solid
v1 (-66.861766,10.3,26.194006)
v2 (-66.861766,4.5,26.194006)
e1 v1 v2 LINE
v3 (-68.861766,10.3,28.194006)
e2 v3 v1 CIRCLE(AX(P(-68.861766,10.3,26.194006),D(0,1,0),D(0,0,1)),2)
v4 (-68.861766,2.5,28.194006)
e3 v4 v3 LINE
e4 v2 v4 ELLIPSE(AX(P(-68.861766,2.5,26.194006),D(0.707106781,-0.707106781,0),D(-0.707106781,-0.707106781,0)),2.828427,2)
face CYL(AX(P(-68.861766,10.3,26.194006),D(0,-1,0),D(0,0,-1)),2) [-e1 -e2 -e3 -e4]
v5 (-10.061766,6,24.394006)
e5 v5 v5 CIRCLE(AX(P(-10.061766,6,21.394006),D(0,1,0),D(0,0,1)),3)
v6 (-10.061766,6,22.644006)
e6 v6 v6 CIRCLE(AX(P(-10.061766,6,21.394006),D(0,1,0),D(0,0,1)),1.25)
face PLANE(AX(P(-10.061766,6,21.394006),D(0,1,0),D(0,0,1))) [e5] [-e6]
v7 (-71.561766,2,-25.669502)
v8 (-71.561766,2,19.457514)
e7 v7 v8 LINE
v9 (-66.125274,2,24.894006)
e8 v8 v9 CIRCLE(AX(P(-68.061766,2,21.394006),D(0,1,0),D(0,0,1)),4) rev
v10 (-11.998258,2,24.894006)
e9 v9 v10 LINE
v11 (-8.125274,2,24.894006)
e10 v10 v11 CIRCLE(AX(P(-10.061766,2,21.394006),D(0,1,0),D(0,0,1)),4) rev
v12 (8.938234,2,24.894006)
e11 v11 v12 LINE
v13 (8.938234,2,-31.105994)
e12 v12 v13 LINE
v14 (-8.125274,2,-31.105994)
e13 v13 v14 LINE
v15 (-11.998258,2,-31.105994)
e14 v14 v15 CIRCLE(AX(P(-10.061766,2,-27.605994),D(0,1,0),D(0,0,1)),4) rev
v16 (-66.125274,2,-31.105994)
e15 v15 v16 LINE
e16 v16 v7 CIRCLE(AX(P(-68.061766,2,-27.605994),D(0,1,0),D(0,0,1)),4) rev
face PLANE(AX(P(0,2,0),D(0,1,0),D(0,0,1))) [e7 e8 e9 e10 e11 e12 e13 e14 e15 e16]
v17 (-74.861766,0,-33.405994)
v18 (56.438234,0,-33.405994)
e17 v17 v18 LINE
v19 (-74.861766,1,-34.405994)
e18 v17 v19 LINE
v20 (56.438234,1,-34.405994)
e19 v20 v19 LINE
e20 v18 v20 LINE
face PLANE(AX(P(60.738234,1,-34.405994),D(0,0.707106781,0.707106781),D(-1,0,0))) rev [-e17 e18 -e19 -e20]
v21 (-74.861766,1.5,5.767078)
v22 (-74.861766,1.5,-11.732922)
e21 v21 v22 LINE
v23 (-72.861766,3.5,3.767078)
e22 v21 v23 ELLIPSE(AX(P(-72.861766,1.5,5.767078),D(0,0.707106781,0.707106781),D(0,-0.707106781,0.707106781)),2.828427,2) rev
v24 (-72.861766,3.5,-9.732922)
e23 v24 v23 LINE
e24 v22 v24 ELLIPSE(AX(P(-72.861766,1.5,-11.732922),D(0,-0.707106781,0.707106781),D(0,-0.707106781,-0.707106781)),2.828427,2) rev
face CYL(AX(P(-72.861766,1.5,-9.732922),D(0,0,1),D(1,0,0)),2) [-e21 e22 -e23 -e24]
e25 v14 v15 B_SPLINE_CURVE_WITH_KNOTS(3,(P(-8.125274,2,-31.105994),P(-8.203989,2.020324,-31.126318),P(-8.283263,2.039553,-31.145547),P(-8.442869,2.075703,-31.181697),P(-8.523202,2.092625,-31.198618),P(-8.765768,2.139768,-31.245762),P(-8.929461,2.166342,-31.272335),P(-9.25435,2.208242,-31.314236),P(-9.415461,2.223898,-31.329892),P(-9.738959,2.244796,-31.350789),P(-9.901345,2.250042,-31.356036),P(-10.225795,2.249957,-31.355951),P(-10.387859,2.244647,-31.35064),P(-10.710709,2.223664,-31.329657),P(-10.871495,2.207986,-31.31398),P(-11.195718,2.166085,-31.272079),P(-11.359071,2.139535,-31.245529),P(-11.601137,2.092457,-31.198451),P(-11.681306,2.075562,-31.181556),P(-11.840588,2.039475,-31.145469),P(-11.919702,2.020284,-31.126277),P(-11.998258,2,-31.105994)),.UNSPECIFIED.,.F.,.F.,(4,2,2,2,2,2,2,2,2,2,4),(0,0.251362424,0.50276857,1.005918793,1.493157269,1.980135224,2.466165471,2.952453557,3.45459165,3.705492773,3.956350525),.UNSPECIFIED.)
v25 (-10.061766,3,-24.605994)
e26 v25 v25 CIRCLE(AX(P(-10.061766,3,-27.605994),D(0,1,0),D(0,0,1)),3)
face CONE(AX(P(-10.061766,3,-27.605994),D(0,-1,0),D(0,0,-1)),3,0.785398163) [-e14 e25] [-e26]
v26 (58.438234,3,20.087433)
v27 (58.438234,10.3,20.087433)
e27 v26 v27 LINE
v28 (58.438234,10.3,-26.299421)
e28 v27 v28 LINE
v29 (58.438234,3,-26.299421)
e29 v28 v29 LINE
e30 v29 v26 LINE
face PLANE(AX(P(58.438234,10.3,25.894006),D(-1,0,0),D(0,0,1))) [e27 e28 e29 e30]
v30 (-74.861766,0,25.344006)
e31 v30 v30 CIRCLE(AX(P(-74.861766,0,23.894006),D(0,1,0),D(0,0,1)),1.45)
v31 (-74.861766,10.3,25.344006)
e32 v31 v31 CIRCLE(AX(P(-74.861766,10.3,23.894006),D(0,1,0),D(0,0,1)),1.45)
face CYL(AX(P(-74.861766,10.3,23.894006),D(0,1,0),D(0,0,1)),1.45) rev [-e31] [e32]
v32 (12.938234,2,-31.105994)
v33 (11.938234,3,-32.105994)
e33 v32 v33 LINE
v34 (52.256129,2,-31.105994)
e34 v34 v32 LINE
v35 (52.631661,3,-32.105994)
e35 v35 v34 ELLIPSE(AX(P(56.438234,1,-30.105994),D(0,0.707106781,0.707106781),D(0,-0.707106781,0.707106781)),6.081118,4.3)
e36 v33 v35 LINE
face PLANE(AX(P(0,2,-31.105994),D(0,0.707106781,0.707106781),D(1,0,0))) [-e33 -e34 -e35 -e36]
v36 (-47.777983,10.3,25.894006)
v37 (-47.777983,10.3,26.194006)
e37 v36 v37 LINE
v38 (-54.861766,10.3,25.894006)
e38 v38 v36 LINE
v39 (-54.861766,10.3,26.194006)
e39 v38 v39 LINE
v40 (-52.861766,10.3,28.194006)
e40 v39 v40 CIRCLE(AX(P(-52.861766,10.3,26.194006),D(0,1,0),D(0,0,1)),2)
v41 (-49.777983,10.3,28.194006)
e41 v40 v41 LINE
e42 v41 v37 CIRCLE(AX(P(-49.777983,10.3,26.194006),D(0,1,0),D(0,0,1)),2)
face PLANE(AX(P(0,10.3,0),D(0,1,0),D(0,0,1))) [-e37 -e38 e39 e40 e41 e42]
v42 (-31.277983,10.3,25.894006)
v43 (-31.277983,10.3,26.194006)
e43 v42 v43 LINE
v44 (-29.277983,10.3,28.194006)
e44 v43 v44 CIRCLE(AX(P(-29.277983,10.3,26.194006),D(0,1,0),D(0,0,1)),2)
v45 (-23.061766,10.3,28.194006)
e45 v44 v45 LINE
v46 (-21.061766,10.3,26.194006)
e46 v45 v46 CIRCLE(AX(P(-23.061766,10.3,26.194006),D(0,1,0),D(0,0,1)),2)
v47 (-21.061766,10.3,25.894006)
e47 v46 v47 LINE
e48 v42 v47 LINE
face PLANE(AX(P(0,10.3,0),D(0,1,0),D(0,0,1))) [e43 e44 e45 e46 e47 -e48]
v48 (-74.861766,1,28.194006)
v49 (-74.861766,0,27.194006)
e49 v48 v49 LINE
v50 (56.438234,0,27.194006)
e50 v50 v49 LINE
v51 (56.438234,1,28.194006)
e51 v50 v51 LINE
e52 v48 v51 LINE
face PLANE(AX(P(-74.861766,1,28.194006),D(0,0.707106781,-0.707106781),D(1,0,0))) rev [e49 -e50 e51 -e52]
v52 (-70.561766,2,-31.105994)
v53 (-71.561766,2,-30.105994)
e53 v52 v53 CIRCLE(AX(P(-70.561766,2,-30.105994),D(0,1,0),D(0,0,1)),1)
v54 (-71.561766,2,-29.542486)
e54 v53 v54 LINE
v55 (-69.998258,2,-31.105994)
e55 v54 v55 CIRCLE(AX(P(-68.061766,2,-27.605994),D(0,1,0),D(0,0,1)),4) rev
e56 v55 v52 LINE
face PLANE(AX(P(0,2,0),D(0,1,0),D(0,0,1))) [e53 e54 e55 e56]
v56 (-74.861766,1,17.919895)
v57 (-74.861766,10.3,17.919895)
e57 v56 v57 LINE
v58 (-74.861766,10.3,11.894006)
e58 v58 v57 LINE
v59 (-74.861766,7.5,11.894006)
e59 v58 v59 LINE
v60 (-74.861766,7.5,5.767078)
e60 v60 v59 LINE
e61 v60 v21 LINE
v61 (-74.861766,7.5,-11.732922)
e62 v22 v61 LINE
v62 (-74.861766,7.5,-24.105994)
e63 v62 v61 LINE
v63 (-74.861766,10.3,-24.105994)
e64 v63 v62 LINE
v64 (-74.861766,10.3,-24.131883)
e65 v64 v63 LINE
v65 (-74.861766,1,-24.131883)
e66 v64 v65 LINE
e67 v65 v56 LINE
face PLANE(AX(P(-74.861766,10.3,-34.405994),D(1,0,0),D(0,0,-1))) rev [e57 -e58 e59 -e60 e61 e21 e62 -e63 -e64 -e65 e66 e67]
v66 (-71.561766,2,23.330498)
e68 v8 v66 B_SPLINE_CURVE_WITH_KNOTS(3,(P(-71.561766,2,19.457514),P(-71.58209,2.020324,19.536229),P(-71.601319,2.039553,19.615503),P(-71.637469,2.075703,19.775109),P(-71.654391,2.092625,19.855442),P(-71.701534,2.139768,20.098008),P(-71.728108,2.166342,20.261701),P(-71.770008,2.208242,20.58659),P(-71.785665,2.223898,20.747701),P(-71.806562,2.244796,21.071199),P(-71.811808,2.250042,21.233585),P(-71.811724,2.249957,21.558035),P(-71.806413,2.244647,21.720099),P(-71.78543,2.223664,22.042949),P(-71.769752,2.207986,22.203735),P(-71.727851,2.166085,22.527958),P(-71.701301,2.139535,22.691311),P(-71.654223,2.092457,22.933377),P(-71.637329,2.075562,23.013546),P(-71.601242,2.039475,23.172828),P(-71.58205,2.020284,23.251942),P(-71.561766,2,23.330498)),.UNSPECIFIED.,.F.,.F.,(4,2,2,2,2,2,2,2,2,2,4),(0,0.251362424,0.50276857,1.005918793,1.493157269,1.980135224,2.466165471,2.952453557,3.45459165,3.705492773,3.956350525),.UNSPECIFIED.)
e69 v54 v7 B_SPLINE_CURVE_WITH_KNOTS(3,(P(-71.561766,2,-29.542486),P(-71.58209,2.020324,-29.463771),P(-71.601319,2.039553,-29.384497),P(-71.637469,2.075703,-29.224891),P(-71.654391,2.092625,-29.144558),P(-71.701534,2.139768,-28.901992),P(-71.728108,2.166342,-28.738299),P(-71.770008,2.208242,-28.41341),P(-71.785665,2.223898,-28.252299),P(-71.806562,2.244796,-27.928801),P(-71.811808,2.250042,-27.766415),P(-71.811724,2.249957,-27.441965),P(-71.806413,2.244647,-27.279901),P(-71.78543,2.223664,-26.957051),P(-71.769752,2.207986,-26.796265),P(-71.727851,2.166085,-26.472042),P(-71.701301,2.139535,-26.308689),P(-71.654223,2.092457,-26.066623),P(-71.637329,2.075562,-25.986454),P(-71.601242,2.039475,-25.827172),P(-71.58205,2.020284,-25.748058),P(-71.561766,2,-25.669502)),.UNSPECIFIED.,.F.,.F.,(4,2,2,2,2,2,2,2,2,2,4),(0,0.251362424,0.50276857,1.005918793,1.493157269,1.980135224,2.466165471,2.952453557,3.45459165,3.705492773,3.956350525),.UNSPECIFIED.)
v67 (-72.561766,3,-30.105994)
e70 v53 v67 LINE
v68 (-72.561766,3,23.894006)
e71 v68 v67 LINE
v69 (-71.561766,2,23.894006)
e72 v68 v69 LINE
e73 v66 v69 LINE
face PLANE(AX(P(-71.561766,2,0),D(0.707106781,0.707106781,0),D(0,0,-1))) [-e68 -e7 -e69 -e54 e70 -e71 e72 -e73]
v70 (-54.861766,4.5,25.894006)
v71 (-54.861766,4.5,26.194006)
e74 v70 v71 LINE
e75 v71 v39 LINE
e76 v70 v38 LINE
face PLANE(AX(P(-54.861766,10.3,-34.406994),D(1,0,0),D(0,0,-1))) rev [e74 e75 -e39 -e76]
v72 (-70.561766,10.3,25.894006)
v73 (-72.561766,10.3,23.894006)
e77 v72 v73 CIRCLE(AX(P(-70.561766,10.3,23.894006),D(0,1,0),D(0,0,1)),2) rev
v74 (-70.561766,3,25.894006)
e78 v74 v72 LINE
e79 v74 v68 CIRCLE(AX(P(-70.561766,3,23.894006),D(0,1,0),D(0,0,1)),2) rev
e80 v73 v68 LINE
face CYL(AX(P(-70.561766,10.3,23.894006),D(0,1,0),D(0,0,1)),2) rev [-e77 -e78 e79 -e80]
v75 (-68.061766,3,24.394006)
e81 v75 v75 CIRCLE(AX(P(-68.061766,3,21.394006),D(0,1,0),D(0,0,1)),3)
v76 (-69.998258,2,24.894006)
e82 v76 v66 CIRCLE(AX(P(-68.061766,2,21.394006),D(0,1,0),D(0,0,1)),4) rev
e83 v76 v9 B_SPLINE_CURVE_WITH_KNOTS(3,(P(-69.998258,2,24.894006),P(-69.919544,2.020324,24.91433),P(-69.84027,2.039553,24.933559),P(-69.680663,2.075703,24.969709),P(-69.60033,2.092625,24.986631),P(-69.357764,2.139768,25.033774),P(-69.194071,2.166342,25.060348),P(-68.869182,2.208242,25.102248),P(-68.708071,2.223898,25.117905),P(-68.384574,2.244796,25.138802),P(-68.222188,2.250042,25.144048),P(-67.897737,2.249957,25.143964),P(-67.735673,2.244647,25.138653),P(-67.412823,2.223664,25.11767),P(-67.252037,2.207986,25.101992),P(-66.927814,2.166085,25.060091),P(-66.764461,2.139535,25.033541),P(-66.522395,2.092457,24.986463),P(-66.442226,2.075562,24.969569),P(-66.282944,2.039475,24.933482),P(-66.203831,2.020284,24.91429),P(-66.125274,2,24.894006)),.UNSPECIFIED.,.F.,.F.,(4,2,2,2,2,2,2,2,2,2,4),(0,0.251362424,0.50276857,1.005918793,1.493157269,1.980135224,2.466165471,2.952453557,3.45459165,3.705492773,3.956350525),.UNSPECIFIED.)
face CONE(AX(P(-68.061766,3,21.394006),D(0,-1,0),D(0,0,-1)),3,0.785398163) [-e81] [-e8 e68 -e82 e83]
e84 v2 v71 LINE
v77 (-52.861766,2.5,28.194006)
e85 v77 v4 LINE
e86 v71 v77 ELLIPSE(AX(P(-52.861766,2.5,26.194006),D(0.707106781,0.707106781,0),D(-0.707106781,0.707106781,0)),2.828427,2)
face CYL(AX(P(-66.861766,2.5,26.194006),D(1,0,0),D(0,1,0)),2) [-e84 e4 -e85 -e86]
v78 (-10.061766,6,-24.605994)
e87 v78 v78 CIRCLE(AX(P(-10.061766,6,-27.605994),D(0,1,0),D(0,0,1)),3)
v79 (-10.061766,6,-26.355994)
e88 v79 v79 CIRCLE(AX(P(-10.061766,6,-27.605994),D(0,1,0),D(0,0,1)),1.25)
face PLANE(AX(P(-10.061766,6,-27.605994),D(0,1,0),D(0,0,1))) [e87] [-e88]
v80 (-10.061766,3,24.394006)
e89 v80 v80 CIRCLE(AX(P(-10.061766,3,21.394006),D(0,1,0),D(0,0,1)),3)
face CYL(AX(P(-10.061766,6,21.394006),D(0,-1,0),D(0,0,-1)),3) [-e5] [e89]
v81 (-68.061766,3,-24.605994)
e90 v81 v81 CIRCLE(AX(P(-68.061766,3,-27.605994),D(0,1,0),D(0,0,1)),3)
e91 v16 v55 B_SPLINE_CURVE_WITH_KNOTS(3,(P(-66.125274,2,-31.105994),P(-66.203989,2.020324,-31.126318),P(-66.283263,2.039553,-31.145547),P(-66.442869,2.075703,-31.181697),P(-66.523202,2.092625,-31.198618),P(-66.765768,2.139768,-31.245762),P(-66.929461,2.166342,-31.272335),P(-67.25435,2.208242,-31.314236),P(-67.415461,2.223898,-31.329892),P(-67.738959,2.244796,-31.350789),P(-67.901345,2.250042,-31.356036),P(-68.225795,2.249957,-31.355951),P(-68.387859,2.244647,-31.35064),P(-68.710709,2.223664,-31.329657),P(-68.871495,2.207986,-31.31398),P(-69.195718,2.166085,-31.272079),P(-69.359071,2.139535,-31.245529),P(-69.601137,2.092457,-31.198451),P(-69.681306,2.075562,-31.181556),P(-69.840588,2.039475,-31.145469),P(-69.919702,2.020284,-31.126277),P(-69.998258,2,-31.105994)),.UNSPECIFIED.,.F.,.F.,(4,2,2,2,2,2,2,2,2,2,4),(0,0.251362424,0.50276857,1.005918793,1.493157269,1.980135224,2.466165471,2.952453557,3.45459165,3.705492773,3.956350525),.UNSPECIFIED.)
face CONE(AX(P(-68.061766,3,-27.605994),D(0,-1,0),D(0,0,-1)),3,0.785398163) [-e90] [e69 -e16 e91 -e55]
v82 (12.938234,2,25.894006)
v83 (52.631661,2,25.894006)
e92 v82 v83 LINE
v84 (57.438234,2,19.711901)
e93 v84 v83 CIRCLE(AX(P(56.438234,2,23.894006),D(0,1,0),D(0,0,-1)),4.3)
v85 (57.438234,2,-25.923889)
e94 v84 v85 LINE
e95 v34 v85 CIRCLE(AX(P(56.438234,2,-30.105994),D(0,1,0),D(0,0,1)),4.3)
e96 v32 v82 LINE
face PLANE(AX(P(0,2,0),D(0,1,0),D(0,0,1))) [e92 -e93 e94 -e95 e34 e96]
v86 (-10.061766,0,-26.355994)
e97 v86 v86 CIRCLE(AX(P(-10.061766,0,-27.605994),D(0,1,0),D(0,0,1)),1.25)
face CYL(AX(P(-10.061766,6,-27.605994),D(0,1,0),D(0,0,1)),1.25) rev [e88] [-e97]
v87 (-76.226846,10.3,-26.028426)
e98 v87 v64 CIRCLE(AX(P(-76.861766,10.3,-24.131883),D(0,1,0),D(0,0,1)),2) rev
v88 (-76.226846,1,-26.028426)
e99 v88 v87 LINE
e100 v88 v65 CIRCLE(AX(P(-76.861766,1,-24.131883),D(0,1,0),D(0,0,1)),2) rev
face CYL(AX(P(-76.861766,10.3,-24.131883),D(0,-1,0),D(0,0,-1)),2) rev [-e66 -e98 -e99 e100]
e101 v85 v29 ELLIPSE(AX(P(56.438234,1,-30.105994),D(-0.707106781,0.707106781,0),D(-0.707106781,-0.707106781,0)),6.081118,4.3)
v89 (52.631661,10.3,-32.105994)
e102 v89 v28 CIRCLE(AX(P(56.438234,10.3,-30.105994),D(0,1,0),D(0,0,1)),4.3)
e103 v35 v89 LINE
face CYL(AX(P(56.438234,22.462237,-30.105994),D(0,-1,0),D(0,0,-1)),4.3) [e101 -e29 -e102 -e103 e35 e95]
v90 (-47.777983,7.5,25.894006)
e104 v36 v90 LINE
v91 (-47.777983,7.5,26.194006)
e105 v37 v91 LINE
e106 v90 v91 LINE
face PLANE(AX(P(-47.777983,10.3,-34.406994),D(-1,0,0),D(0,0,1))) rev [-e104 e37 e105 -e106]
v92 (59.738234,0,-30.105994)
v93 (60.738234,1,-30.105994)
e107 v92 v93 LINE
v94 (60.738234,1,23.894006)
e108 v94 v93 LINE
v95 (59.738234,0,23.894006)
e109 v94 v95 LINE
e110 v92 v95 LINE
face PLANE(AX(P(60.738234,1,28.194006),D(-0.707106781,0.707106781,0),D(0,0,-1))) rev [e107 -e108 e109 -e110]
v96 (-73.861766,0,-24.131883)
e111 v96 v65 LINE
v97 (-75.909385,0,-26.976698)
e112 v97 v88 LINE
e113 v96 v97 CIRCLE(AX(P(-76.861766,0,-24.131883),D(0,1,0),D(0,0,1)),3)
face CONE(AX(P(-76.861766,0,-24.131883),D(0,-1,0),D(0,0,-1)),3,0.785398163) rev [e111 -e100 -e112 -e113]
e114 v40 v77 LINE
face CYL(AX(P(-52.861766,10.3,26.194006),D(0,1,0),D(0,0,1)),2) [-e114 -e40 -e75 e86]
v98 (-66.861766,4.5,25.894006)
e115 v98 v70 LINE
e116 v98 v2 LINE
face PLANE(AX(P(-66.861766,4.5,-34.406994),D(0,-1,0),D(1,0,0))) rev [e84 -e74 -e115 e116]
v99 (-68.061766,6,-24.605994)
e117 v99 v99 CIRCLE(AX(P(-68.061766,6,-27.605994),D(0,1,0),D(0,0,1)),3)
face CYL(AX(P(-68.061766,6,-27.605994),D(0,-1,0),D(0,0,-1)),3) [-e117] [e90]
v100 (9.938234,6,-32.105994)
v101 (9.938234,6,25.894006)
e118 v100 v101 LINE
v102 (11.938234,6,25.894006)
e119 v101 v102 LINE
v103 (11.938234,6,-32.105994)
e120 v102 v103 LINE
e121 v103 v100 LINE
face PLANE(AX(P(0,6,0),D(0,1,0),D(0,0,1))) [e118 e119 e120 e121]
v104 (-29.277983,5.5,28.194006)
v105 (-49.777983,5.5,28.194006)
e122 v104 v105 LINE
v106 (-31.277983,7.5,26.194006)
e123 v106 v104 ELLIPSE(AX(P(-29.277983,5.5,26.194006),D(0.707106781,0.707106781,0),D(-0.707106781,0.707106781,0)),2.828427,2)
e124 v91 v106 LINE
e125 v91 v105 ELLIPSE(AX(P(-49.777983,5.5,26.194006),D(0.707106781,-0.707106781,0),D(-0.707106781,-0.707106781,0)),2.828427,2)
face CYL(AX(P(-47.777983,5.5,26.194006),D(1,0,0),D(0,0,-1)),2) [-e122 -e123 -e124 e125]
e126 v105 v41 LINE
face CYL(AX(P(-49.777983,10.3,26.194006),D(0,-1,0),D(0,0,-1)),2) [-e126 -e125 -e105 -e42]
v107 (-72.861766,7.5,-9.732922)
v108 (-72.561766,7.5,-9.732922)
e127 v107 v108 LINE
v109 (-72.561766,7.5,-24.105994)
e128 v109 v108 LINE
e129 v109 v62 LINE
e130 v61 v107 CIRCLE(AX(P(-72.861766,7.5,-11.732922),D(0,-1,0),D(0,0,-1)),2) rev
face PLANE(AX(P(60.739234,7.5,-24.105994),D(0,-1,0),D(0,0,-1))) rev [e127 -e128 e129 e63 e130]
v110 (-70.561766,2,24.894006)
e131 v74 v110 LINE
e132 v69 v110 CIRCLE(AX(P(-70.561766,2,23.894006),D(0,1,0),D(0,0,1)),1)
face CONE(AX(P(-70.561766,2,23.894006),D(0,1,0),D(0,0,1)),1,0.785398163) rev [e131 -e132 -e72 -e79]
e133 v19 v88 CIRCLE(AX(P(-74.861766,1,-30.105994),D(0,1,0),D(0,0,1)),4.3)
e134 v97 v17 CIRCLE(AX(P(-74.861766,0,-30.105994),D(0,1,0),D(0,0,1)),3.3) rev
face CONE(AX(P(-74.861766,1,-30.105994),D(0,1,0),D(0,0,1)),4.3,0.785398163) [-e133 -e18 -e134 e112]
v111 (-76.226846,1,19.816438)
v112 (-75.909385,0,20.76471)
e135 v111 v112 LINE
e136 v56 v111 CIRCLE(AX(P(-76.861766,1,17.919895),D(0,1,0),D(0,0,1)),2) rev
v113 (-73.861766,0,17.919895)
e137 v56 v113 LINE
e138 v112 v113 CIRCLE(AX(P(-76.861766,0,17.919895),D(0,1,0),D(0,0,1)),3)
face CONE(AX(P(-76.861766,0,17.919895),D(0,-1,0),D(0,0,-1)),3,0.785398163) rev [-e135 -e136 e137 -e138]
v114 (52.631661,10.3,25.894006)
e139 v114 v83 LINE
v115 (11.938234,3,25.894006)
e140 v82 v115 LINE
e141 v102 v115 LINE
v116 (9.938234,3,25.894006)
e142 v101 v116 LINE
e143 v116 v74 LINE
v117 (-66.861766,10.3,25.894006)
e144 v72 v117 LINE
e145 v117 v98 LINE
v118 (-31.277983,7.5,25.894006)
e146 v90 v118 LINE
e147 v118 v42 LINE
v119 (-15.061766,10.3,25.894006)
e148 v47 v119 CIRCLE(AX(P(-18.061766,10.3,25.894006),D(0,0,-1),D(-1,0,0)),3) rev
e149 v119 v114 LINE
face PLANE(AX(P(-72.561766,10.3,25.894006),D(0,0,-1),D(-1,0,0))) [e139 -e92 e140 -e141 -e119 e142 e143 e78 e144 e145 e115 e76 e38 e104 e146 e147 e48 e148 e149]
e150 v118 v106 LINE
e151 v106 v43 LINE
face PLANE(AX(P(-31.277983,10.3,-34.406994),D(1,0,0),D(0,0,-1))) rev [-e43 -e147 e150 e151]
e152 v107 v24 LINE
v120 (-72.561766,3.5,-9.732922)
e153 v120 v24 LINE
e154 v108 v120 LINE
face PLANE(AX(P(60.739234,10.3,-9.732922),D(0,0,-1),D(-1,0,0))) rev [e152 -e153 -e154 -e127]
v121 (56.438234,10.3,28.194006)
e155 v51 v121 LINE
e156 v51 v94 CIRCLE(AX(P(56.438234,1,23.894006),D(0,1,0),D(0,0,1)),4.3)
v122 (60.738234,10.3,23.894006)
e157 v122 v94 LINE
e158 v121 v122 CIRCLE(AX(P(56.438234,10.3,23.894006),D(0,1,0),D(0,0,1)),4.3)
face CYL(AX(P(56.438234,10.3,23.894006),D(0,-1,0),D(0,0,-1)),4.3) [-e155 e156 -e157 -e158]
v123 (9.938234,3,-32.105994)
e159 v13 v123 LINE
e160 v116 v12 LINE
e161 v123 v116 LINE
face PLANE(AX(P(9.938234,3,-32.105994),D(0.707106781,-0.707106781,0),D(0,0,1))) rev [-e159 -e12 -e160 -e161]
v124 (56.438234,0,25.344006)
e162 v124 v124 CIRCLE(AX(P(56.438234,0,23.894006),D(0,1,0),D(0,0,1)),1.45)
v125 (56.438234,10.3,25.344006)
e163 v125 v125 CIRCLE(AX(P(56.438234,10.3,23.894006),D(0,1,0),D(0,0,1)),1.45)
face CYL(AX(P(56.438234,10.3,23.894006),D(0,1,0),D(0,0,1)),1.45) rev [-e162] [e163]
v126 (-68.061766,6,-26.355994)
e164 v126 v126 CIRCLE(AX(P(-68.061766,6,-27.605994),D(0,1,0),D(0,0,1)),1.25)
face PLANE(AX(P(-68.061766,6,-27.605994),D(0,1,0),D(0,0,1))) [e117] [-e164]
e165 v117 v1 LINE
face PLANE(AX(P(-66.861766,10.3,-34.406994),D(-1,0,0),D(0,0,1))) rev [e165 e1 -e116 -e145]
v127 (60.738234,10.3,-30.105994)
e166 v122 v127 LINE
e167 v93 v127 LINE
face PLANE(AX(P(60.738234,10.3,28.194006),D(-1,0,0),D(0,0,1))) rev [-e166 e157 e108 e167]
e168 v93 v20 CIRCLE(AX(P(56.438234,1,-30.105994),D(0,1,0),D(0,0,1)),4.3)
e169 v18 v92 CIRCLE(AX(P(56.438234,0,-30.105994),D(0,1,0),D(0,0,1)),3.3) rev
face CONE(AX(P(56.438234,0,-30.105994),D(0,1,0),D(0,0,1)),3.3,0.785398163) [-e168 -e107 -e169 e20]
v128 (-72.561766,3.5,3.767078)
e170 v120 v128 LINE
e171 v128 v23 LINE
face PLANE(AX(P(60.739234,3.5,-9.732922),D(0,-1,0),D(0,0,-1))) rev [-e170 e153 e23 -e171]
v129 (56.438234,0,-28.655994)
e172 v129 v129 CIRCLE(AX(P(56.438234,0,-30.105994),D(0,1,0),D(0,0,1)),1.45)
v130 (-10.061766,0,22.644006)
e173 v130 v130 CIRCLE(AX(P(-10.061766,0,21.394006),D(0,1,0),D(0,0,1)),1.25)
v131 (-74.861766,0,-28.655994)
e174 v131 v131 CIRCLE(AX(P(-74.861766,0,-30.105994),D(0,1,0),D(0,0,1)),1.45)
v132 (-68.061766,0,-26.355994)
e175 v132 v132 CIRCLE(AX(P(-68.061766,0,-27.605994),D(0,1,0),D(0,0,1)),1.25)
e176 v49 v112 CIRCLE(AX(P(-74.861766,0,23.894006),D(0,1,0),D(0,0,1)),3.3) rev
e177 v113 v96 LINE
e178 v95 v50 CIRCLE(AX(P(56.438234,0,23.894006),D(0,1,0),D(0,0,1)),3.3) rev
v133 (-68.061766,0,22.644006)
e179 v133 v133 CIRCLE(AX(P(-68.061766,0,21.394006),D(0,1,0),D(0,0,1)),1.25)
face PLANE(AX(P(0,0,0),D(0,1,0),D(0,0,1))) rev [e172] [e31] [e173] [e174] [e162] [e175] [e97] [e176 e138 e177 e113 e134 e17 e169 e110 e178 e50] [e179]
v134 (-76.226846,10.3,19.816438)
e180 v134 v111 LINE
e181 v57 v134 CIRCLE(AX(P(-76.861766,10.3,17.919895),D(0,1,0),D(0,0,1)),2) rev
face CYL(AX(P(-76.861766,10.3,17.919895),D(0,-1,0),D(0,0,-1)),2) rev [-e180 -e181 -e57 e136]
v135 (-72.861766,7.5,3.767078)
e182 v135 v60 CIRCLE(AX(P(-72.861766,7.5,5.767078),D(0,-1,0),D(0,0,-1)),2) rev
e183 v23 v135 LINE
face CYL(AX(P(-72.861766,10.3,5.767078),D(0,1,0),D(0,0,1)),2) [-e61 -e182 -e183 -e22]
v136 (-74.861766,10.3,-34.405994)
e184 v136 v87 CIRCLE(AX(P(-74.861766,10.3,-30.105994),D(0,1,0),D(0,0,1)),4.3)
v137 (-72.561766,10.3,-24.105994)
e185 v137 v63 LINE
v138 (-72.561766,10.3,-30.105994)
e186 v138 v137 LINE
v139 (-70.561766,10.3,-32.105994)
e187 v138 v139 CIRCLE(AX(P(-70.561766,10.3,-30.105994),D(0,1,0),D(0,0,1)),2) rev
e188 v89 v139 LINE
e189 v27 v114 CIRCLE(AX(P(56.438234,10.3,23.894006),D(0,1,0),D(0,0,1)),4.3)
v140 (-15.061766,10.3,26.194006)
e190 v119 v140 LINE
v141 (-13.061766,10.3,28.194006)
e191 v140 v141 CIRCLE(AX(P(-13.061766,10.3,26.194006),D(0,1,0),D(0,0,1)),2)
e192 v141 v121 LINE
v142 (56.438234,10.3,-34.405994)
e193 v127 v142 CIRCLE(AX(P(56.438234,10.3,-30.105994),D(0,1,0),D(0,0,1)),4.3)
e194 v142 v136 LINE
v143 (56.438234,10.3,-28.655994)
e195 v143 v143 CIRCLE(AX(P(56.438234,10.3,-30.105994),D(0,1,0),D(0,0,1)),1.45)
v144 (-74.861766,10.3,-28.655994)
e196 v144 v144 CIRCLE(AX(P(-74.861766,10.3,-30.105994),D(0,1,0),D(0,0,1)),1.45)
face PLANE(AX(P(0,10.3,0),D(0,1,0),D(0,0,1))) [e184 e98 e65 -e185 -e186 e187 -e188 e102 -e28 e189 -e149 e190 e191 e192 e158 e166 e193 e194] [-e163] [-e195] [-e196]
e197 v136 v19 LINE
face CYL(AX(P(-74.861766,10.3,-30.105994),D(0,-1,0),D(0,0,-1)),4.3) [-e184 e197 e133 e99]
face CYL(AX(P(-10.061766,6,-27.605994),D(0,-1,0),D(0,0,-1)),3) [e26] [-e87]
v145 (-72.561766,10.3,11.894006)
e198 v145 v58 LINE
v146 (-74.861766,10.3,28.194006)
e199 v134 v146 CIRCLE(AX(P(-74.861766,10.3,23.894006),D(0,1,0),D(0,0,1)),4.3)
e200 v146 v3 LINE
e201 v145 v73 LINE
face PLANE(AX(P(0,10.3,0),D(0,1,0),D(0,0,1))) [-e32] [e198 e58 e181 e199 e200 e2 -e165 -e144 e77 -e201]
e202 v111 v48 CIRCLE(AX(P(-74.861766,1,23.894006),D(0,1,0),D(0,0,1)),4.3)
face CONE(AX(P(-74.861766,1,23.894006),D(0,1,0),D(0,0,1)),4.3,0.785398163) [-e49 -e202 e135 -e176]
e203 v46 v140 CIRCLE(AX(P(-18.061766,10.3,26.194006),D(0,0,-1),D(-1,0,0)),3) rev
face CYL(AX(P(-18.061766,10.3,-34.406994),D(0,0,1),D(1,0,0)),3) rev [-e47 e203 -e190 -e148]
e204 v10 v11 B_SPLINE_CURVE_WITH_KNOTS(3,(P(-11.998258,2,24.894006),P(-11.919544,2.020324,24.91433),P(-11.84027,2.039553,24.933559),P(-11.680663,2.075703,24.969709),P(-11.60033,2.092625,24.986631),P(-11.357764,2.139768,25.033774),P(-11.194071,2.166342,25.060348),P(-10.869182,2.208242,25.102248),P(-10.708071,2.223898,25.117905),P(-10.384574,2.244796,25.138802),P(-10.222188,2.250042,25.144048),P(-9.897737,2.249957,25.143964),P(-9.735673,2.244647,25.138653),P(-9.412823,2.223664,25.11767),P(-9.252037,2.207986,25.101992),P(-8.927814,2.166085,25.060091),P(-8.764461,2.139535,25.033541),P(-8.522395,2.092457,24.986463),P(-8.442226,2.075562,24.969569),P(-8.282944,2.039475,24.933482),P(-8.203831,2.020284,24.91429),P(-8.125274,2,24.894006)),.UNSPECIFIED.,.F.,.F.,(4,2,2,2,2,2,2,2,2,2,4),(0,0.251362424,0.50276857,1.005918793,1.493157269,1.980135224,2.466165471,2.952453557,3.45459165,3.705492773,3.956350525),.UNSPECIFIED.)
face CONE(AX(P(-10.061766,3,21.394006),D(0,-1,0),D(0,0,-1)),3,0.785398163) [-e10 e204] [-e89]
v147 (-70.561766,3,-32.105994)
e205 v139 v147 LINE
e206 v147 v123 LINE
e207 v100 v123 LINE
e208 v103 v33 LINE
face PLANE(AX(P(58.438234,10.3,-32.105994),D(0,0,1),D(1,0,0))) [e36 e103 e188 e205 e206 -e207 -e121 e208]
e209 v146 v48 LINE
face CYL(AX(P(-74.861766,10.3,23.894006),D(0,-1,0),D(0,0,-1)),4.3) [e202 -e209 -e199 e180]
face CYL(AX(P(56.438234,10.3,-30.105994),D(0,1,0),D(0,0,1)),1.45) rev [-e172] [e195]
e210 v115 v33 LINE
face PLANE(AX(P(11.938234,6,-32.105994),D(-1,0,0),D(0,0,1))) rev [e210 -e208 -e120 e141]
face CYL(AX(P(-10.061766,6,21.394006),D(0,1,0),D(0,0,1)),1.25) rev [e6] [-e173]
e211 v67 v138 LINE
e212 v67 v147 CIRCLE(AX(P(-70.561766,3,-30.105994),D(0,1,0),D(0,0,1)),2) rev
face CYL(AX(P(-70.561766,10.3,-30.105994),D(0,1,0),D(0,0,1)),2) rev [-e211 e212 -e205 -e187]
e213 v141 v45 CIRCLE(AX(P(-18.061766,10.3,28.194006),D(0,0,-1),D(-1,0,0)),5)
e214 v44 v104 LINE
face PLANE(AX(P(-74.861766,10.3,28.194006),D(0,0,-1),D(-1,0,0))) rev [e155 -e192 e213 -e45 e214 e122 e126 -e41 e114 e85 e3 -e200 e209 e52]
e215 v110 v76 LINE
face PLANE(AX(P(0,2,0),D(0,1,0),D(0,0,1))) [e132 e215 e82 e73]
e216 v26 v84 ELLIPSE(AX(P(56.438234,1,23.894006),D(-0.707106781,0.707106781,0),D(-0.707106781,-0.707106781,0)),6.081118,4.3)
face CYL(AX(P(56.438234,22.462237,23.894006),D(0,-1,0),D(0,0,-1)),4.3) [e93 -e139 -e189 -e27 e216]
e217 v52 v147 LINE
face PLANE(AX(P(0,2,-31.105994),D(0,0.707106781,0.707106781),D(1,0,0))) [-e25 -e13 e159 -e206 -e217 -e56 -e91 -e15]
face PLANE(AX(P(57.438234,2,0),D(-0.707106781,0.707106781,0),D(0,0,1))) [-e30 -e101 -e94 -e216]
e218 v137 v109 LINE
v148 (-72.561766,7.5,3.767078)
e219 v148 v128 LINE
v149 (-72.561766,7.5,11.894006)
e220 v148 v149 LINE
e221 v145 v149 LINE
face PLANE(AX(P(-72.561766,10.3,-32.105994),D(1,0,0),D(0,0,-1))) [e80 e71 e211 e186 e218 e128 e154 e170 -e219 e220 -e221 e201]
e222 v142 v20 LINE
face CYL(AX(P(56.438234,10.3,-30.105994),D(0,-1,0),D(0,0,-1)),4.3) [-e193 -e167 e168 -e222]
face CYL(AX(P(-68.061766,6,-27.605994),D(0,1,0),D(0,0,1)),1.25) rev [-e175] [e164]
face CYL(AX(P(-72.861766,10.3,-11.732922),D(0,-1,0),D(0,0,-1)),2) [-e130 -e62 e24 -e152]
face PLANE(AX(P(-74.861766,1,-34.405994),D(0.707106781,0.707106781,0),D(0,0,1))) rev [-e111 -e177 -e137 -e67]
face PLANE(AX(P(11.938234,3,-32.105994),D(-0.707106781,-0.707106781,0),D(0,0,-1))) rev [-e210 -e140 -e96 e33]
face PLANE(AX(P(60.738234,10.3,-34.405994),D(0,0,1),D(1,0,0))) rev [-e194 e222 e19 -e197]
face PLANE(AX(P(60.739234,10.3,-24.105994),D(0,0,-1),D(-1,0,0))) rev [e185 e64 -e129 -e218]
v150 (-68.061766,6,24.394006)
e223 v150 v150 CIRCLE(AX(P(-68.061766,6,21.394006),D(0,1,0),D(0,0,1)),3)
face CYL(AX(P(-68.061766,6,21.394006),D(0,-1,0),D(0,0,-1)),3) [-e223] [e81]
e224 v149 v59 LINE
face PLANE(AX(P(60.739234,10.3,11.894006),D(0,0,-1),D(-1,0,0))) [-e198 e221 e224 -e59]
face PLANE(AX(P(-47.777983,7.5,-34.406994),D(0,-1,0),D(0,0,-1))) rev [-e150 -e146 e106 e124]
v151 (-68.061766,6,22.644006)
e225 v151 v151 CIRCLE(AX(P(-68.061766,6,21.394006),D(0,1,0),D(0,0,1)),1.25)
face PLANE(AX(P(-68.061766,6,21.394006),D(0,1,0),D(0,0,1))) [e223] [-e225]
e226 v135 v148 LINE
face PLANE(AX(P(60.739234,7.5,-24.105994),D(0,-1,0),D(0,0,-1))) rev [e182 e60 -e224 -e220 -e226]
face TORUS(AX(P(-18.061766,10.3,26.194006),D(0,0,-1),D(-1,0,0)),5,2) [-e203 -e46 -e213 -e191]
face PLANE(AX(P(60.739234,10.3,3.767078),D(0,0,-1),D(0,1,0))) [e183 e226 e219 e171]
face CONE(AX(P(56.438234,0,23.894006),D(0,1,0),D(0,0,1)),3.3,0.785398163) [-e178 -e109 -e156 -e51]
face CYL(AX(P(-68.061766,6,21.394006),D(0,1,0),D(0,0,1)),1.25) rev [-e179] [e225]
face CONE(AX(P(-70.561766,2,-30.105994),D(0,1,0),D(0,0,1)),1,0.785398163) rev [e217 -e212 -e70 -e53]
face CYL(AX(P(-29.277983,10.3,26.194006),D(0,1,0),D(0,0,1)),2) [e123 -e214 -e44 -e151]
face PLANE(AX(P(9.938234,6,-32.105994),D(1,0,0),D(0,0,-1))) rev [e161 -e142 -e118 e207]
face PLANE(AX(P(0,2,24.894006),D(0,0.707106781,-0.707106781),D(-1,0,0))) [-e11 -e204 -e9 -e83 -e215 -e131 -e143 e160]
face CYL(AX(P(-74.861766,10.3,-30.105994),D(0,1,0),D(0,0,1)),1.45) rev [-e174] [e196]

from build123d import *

# Parameters (mm, degrees)
SKETCH3_W                      = 135.6
SKETCH3_H                      = 62.6
SKETCH3_W_2                    = 131
SKETCH3_H_2                    = 58
BOSS_EXTRUDE1_DEPTH            = 10.3
SKETCH5_W                      = 131
SKETCH5_H                      = 58
BOSS_EXTRUDE2_DEPTH            = 2
SKETCH6_R                      = 3
BOSS_EXTRUDE3_DEPTH            = 4
F_2_5_2_5_DIAMETER_HOLE1_D     = 2.5
F_2_5_2_5_DIAMETER_HOLE1_DEPTH = 8
F_2_5_2_5_DIAMETER_HOLE1_TIP   = 0.751075774
SKETCH10_W                     = 2
SKETCH10_H                     = 58
BOSS_EXTRUDE4_DEPTH            = 4
CUT_EXTRUDE1_REACH             = 100.128
SKETCH11_R                     = 3
SKETCH11_W                     = 12
SKETCH11_H                     = 5.8
SKETCH11_W_2                   = 16.5
SKETCH11_H_2                   = 2.8
CUT_EXTRUDE2_REACH             = 142.276
SKETCH12_W                     = 13.5
SKETCH12_H                     = 6.8
SKETCH12_W_2                   = 36
SKETCH12_H_2                   = 2.8
FILLET6_R                      = 2
FILLET8_R                      = 2
CHAMFER1_SIZE                  = 1
FILLET9_R                      = 2
BOSS_EXTRUDE6_DEPTH            = 10.3
F_2_9_2_9_DIAMETER_HOLE2_D     = 2.9
F_2_9_2_9_DIAMETER_HOLE1_D     = 2.9
SKETCH24_R                     = 4.3
BOSS_EXTRUDE7_DEPTH            = 8.3
F_2_9_2_9_DIAMETER_HOLE5_D     = 2.9
F_2_9_2_9_DIAMETER_HOLE4_D     = 2.9
FILLET10_R                     = 4.3
FILLET18_R                     = 2
CHAMFER3_SIZE                  = 1
FILLET19_R                     = 2
FILLET20_R                     = 4.3
CHAMFER6_SIZE                  = 1
CHAMFER7_SIZE                  = 1


# Some blends are built 0.0001 mm under size
with BuildPart() as part:
    # Sketch3 → Boss-Extrude1 (new body)
    with BuildSketch(Plane(origin=(0, 0, 0), x_dir=(1, 0, 0), z_dir=(0, 1, 0))):
        with Locations((-7.061766162, 3.105993834)):
            Rectangle(SKETCH3_W, SKETCH3_H)
        with Locations((-7.061766162, 3.105993834)):
            Rectangle(SKETCH3_W_2, SKETCH3_H_2, mode=Mode.SUBTRACT)
    extrude(amount=BOSS_EXTRUDE1_DEPTH)

    # Sketch5 → Boss-Extrude2 (add)
    with BuildSketch(Plane(origin=(0, 0, 0), x_dir=(1, 0, 0), z_dir=(0, 1, 0))):
        with Locations((-7.061766162, 3.105993834)):
            Rectangle(SKETCH5_W, SKETCH5_H)
    extrude(amount=BOSS_EXTRUDE2_DEPTH)

    # Sketch6 → Boss-Extrude3 (add)
    with BuildSketch(Plane(origin=(0, 2, 0), x_dir=(1, 0, 0), z_dir=(0, 1, 0))):
        with Locations(Location((-68.061766162, 27.605993834, 0), (0, 0, 270))):
            Circle(SKETCH6_R)
        with Locations(Location((-68.061766162, -21.394006166, 0), (0, 0, 270))):
            Circle(SKETCH6_R)
        with Locations(Location((-10.061766162, -21.394006166, 0), (0, 0, 270))):
            Circle(SKETCH6_R)
        with Locations(Location((-10.061766162, 27.605993834, 0), (0, 0, 270))):
            Circle(SKETCH6_R)
    extrude(amount=BOSS_EXTRUDE3_DEPTH)

    # Ø2.5 (2.5) Diameter Hole1
    with Locations(Plane(origin=(0, 6, 0), x_dir=(1, 0, 0), z_dir=(0, 1, 0))):
        with Locations((-68.061766162, 27.605993834), (-10.061766162, 27.605993834), (-10.061766162, -21.394006166), (-68.061766162, -21.394006166)):
            Hole(F_2_5_2_5_DIAMETER_HOLE1_D / 2, depth=F_2_5_2_5_DIAMETER_HOLE1_DEPTH)
            with Locations((0, 0, -(F_2_5_2_5_DIAMETER_HOLE1_DEPTH + F_2_5_2_5_DIAMETER_HOLE1_TIP / 2))):  # 118° drill point
                Cone(0, F_2_5_2_5_DIAMETER_HOLE1_D / 2, F_2_5_2_5_DIAMETER_HOLE1_TIP, mode=Mode.SUBTRACT)

    # Sketch10 → Boss-Extrude4 (add)
    with BuildSketch(Plane(origin=(0, 2, 0), x_dir=(1, 0, 0), z_dir=(0, 1, 0))):
        with Locations((10.938233838, 3.105993834)):
            Rectangle(SKETCH10_W, SKETCH10_H)
    extrude(amount=BOSS_EXTRUDE4_DEPTH)

    # Sketch11 → Cut-Extrude1 (cut, up to next)
    with BuildSketch(Plane.XY.offset(28.194006166), mode=Mode.PRIVATE) as cut_extrude1_sk1:
        with Locations((-18.061766162, 10.3)):
            Circle(SKETCH11_R)
    cut_extrude1_tool1 = extrude(cut_extrude1_sk1.sketch, amount=-CUT_EXTRUDE1_REACH, mode=Mode.PRIVATE) & part.part
    # Sketch11 → Cut-Extrude1 (cut, up to next)
    with BuildSketch(Plane.XY.offset(28.194006166), mode=Mode.PRIVATE) as cut_extrude1_sk2:
        with Locations((-60.861766162, 7.4)):
            Rectangle(SKETCH11_W, SKETCH11_H)
    cut_extrude1_tool2 = extrude(cut_extrude1_sk2.sketch, amount=-CUT_EXTRUDE1_REACH, mode=Mode.PRIVATE) & part.part
    # Sketch11 → Cut-Extrude1 (cut, up to next)
    with BuildSketch(Plane.XY.offset(28.194006166), mode=Mode.PRIVATE) as cut_extrude1_sk3:
        with Locations((-39.527982648, 8.9)):
            Rectangle(SKETCH11_W_2, SKETCH11_H_2)
    cut_extrude1_tool3 = extrude(cut_extrude1_sk3.sketch, amount=-CUT_EXTRUDE1_REACH, mode=Mode.PRIVATE) & part.part
    add(cut_extrude1_tool1.solids().sort_by_distance((-18.061766, 10.3, 28.194006))[0], mode=Mode.SUBTRACT)
    add(cut_extrude1_tool2.solids().sort_by_distance((-60.861766, 7.4, 28.194006))[0], mode=Mode.SUBTRACT)
    add(cut_extrude1_tool3.solids().sort_by_distance((-39.527983, 8.9, 28.194006))[0], mode=Mode.SUBTRACT)

    # Sketch12 → Cut-Extrude2 (cut, up to next)
    with BuildSketch(Plane.ZY.offset(74.861766162), mode=Mode.PRIVATE) as cut_extrude2_sk1:
        with Locations((-2.982922372, 6.9)):
            Rectangle(SKETCH12_W, SKETCH12_H)
    cut_extrude2_tool1 = extrude(cut_extrude2_sk1.sketch, amount=-CUT_EXTRUDE2_REACH, mode=Mode.PRIVATE) & part.part
    # Sketch12 → Cut-Extrude2 (cut, up to next)
    with BuildSketch(Plane.ZY.offset(74.861766162), mode=Mode.PRIVATE) as cut_extrude2_sk2:
        with Locations((-6.105993834, 8.9)):
            Rectangle(SKETCH12_W_2, SKETCH12_H_2)
    cut_extrude2_tool2 = extrude(cut_extrude2_sk2.sketch, amount=-CUT_EXTRUDE2_REACH, mode=Mode.PRIVATE) & part.part
    add(cut_extrude2_tool1.solids().sort_by_distance((-74.861766, 6.9, -2.982922))[0], mode=Mode.SUBTRACT)
    add(cut_extrude2_tool2.solids().sort_by_distance((-74.861766, 8.9, -6.105994))[0], mode=Mode.SUBTRACT)

    # Fillet6
    fillet6_edges = [part.edges().sort_by_distance(p)[0] for p in [
        (58.438233838, 6.15, -32.105993834),
    ]]
    fillet(fillet6_edges, radius=FILLET6_R)

    # Fillet8
    fillet8_edges = [part.edges().sort_by_distance(p)[0] for p in [
        (-72.561766162, 6.15, -32.105993834),
        (-72.561766162, 6.15, 25.894006166),
    ]]
    fillet(fillet8_edges, radius=FILLET8_R)

    # Chamfer1
    chamfer1_edges = [part.edges().sort_by_distance(p)[0] for p in [
        (-68.061766162, 2, -30.605993834),
        (-68.061766162, 2, 18.394006166),
        (-10.061766162, 2, 18.394006166),
        (-10.061766162, 2, -30.605993834),
    ]]
    chamfer(chamfer1_edges, length=CHAMFER1_SIZE)

    # Fillet9
    fillet9_edges = [part.edges().sort_by_distance(p)[0] for p in [
        (-60.861766162, 4.5, 28.194006166),
        (-54.861766162, 7.4, 28.194006166),
        (-47.777982648, 8.9, 28.194006166),
        (-39.527982648, 7.5, 28.194006166),
        (-31.277982648, 8.9, 28.194006166),
        (-18.061766162, 7.3, 28.194006166),
        (-74.861766162, 5.5, -9.732922372),
        (-74.861766162, 3.5, -2.982922372),
        (-74.861766162, 5.5, 3.767077628),
    ]]
    fillet(fillet9_edges, radius=FILLET9_R)

    # Sketch17 → Boss-Extrude6 (add)
    with BuildSketch(Plane(origin=(0, 0, 0), x_dir=(1, 0, 0), z_dir=(0, 1, 0))):
        with BuildLine():
            Line((-74.861766162, 34.405993834), (-74.861766162, 25.805993834))
            ThreePointArc((-74.861766162, 25.805993834), (-79.161766162, 30.105993834), (-74.861766162, 34.405993834))
        make_face()
        with BuildLine():
            Line((-74.861766162, -19.594006166), (-74.861766162, -28.194006166))
            ThreePointArc((-74.861766162, -28.194006166), (-79.161766162, -23.894006166), (-74.861766162, -19.594006166))
        make_face()
    extrude(amount=BOSS_EXTRUDE6_DEPTH)

    # Ø2.9 (2.9) Diameter Hole2 (through all)
    with Locations(Plane(origin=(0, 10.3, 0), x_dir=(1, 0, 0), z_dir=(0, 1, 0))):
        with Locations((-74.861766162, 30.105993834)):
            Hole(F_2_9_2_9_DIAMETER_HOLE2_D / 2)

    # Ø2.9 (2.9) Diameter Hole1 (through all)
    with Locations(Plane(origin=(0, 10.3, 0), x_dir=(1, 0, 0), z_dir=(0, 1, 0))):
        with Locations((-74.861766162, -23.894006166)):
            Hole(F_2_9_2_9_DIAMETER_HOLE1_D / 2)

    # Sketch24 → Boss-Extrude7 (add)
    with BuildSketch(Plane(origin=(0, 2, 0), x_dir=(1, 0, 0), z_dir=(0, 1, 0))):
        with Locations((56.438233838, -23.894006166)):
            Circle(SKETCH24_R)
        with Locations((56.438233838, 30.105993834)):
            Circle(SKETCH24_R)
    extrude(amount=BOSS_EXTRUDE7_DEPTH)

    # Ø2.9 (2.9) Diameter Hole5 (through all)
    with Locations(Plane(origin=(0, 10.3, 0), x_dir=(1, 0, 0), z_dir=(0, 1, 0))):
        with Locations((56.438233838, -23.894006166)):
            Hole(F_2_9_2_9_DIAMETER_HOLE5_D / 2)

    # Ø2.9 (2.9) Diameter Hole4 (through all)
    with Locations(Plane(origin=(0, 10.3, 0), x_dir=(1, 0, 0), z_dir=(0, 1, 0))):
        with Locations((56.438233838, 30.105993834)):
            Hole(F_2_9_2_9_DIAMETER_HOLE4_D / 2)

    # Fillet10
    fillet10_edges = [part.edges().sort_by_distance(p)[0] for p in [
        (60.738233838, 5.15, -34.405993834),
    ]]
    fillet(fillet10_edges, radius=FILLET10_R - 0.0001)  # a hair under: the kernel refuses the full size

    # Fillet18
    fillet18_edges = [part.edges().sort_by_distance(p)[0] for p in [
        (-74.861766162, 5.15, -25.805993834),
        (-74.861766162, 5.15, 19.594006166),
    ]]
    fillet(fillet18_edges, radius=FILLET18_R)

    # Chamfer3
    chamfer3_edges = [part.edges().sort_by_distance(p)[0] for p in [
        (-79.105793795, 0, -30.797535193),
        (-9.211716162, 0, -34.405993834),
        (59.478822286, 0, -33.146582283),
        (-79.105793795, 0, 24.585547524),
        (-74.861766162, 0, -3.105993834),
        (-75.2385223, 0, 19.088261462),
        (-75.2385223, 0, -25.300249131),
        (60.738233838, 0, -0.956043834),
        (-7.061766162, 0, 28.194006166),
    ]]
    chamfer(chamfer3_edges, length=CHAMFER3_SIZE)

    # Fillet19
    fillet19_edges = [part.edges().sort_by_distance(p)[0] for p in [
        (-66.861766162, 6.4, 28.194006166),
    ]]
    fillet(fillet19_edges, radius=FILLET19_R)

    # Fillet20
    # the kernel refuses this fillet: 4.3 mm, written as the material it takes off along each edge
    with BuildSketch(Plane(origin=(60.738233838, -9.75, 28.194006166), x_dir=(-1, 0, 0), z_dir=(0, 1, 0))) as fillet20_piece_1:
        with BuildLine():
            CenterArc((FILLET20_R, -FILLET20_R), FILLET20_R, 90, 90)
            Line((0, -FILLET20_R), (0, 0))
            Line((0, 0), (FILLET20_R, 0))
        make_face()
    extrude(amount=30.8, mode=Mode.SUBTRACT)

    # Chamfer5
    # the kernel refuses this chamfer: 1 mm, written as the material it adds along each edge
    with BuildSketch(Plane(origin=(-72.561766162, 2, 23.894006166), x_dir=(-0.027495876610568366, 0.9996219169112972, 0), z_dir=(0, 0, -1))) as chamfer5_piece_1:
        with BuildLine():
            Line((1.028673195, 0), (-0.056547155, 1.027117794))
            Line((-0.056547155, 1.027117794), (-0.076539593, 1.026567876))
            ThreePointArc((-0.076539593, 1.026567876), (-0.034129227, 0.51339783), (-0.019992438, -0.000549918))
            Line((-0.019992438, -0.000549918), (0.000549918, -0.019992438))
            ThreePointArc((0.000549918, -0.019992438), (0.514497665, -0.00585565), (1.029223113, -0.019992438))
            Line((1.029223113, -0.019992438), (1.028673195, 0))
        make_face()
    extrude(amount=54)
    with BuildSketch(Plane(origin=(-70.561766162, 2, 23.894006166), x_dir=(0, 0, 1), z_dir=(1, 0, 0))) as chamfer5_piece_2:
        with BuildLine():
            Line((0.971715729, 0.028284271), (2.028284271, -1.028284271))
            Line((2.028284271, -1.028284271), (2.048284271, -1.028284271))
            ThreePointArc((2.048284271, -1.028284271), (2.02, -0.514142136), (2.02, 0))
            Line((2.02, 0), (2, 0.02))
            ThreePointArc((2, 0.02), (1.485857864, 0.02), (0.971715729, 0.048284271))
            Line((0.971715729, 0.048284271), (0.971715729, 0.028284271))
        make_face()
    revolve(axis=Axis((-70.561766162, 2, 23.894006166), (0, -1, 0)), revolution_arc=90)
    with BuildSketch(Plane(origin=(-70.561766162, 2, -30.105993834), x_dir=(0, 0, -1), z_dir=(1, 0, 0))) as chamfer5_piece_3:
        with BuildLine():
            Line((2.028284271, 1.028284271), (0.971715729, -0.028284271))
            Line((0.971715729, -0.028284271), (0.971715729, -0.048284271))
            ThreePointArc((0.971715729, -0.048284271), (1.485857864, -0.02), (2, -0.02))
            Line((2, -0.02), (2.02, 0))
            ThreePointArc((2.02, 0), (2.02, 0.514142136), (2.048284271, 1.028284271))
            Line((2.048284271, 1.028284271), (2.028284271, 1.028284271))
        make_face()
    revolve(axis=Axis((-70.561766162, 2, -30.105993834), (0, 1, 0)), revolution_arc=90)
    with BuildSketch(Plane(origin=(9.938233838, 2, 25.894006166), x_dir=(0, 0.9996219169112968, 0.027495876610585623), z_dir=(-1, 0, 0)), Plane(origin=(-70.561766162, 2, -32.105993834), x_dir=(0, 0.9996219169112968, -0.027495876610589075), z_dir=(1, 0, 0))) as chamfer5_piece_4:
        with BuildLine():
            Line((1.028673195, 0), (-0.056547155, 1.027117794))
            Line((-0.056547155, 1.027117794), (-0.076539593, 1.026567876))
            ThreePointArc((-0.076539593, 1.026567876), (-0.034129227, 0.51339783), (-0.019992438, -0.000549918))
            Line((-0.019992438, -0.000549918), (0.000549918, -0.019992438))
            ThreePointArc((0.000549918, -0.019992438), (0.514497665, -0.00585565), (1.029223113, -0.019992438))
            Line((1.029223113, -0.019992438), (1.028673195, 0))
        make_face()
    extrude(amount=80.5)
    with BuildSketch(Plane(origin=(9.938233838, 2, 25.894006166), x_dir=(0.027495876610585623, 0.9996219169112968, 0), z_dir=(0, 0, -1)), Plane(origin=(11.938233838, 2, -32.105993834), x_dir=(-0.027495876610585623, 0.9996219169112968, 0), z_dir=(0, 0, 1))) as chamfer5_piece_5:
        with BuildLine():
            Line((1.028673195, 0), (-0.056547155, -1.027117794))
            Line((-0.056547155, -1.027117794), (-0.076539593, -1.026567876))
            ThreePointArc((-0.076539593, -1.026567876), (-0.034129227, -0.51339783), (-0.019992438, 0.000549918))
            Line((-0.019992438, 0.000549918), (0.000549918, 0.019992438))
            ThreePointArc((0.000549918, 0.019992438), (0.514497665, 0.00585565), (1.029223113, 0.019992438))
            Line((1.029223113, 0.019992438), (1.028673195, 0))
        make_face()
    extrude(amount=58)
    with BuildSketch(Plane(origin=(11.938233838, 2, -32.105993834), x_dir=(0, 0.9996219169112968, -0.027495876610589075), z_dir=(1, 0, 0))) as chamfer5_piece_6_section:
        with BuildLine():
            Line((1.028673195, 0), (-0.056547155, 1.027117794))
            Line((-0.056547155, 1.027117794), (-0.076539593, 1.026567876))
            ThreePointArc((-0.076539593, 1.026567876), (-0.034129227, 0.51339783), (-0.019992438, -0.000549918))
            Line((-0.019992438, -0.000549918), (0.000549918, -0.019992438))
            ThreePointArc((0.000549918, -0.019992438), (0.514497665, -0.00585565), (1.029223113, -0.019992438))
            Line((1.029223113, -0.019992438), (1.028673195, 0))
        make_face()
    chamfer5_piece_6 = extrude(amount=43.265109726, mode=Mode.PRIVATE)
    chamfer5_piece_6 = chamfer5_piece_6 - Plane(origin=(56.438233838, 2.330131969, -30.105993834), x_dir=(1, 0, 0), z_dir=(0, -1, 0)) * Cylinder(4.3, 91, mode=Mode.PRIVATE)
    add(chamfer5_piece_6)
    with BuildSketch(Plane(origin=(9.938233838, 2, 28.465689154), x_dir=(0.027495876610585623, 0.9996219169112968, 0), z_dir=(0, 0, -1))) as chamfer5_piece_7a_section:
        with BuildLine():
            Line((1.028673195, 0), (-0.056547155, -1.027117794))
            Line((-0.056547155, -1.027117794), (-0.076539593, -1.026567876))
            ThreePointArc((-0.076539593, -1.026567876), (-0.034129227, -0.51339783), (-0.019992438, 0.000549918))
            Line((-0.019992438, 0.000549918), (0.000549918, 0.019992438))
            ThreePointArc((0.000549918, 0.019992438), (0.514497665, 0.00585565), (1.029223113, 0.019992438))
            Line((1.029223113, 0.019992438), (1.028673195, 0))
        make_face()
    chamfer5_piece_7a = extrude(amount=60.571682988, mode=Mode.PRIVATE)
    chamfer5_piece_7a = split(chamfer5_piece_7a, bisect_by=Plane(origin=(9.608440211, 2.329793627, 25.894006166), z_dir=(0, 0, 1)), keep=Keep.TOP, mode=Mode.PRIVATE)
    with BuildSketch(Plane(origin=(12.509916826, 2, 25.894006166), x_dir=(0, 0.9996219169112968, 0.027495876610585623), z_dir=(-1, 0, 0))) as chamfer5_piece_7b_section:
        with BuildLine():
            Line((1.028673195, 0), (-0.056547155, 1.027117794))
            Line((-0.056547155, 1.027117794), (-0.076539593, 1.026567876))
            ThreePointArc((-0.076539593, 1.026567876), (-0.034129227, 0.51339783), (-0.019992438, -0.000549918))
            Line((-0.019992438, -0.000549918), (0.000549918, -0.019992438))
            ThreePointArc((0.000549918, -0.019992438), (0.514497665, -0.00585565), (1.029223113, -0.019992438))
            Line((1.029223113, -0.019992438), (1.028673195, 0))
        make_face()
    chamfer5_piece_7b = extrude(amount=83.071682988, mode=Mode.PRIVATE)
    chamfer5_piece_7b = split(chamfer5_piece_7b, bisect_by=Plane(origin=(9.938233838, 2.329793627, 25.564212539), z_dir=(1, 0, 0)), keep=Keep.TOP, mode=Mode.PRIVATE)
    chamfer5_piece_7 = chamfer5_piece_7a & chamfer5_piece_7b
    add(chamfer5_piece_7)
    with BuildSketch(Plane(origin=(-70.561766162, 2, -32.105993834), x_dir=(0, 0.9996219169112968, -0.027495876610589075), z_dir=(1, 0, 0))) as chamfer5_piece_8a_section:
        with BuildLine():
            Line((1.028673195, 0), (-0.056547155, 1.027117794))
            Line((-0.056547155, 1.027117794), (-0.076539593, 1.026567876))
            ThreePointArc((-0.076539593, 1.026567876), (-0.034129227, 0.51339783), (-0.019992438, -0.000549918))
            Line((-0.019992438, -0.000549918), (0.000549918, -0.019992438))
            ThreePointArc((0.000549918, -0.019992438), (0.514497665, -0.00585565), (1.029223113, -0.019992438))
            Line((1.029223113, -0.019992438), (1.028673195, 0))
        make_face()
    chamfer5_piece_8a = extrude(amount=83.071682988, mode=Mode.PRIVATE)
    chamfer5_piece_8a = split(chamfer5_piece_8a, bisect_by=Plane(origin=(9.938233838, 2.329793627, -31.776200208), z_dir=(1, 0, 0)), keep=Keep.TOP, mode=Mode.PRIVATE)
    with BuildSketch(Plane(origin=(9.938233838, 2, 25.894006166), x_dir=(0.027495876610585623, 0.9996219169112968, 0), z_dir=(0, 0, -1))) as chamfer5_piece_8b_section:
        with BuildLine():
            Line((1.028673195, 0), (-0.056547155, -1.027117794))
            Line((-0.056547155, -1.027117794), (-0.076539593, -1.026567876))
            ThreePointArc((-0.076539593, -1.026567876), (-0.034129227, -0.51339783), (-0.019992438, 0.000549918))
            Line((-0.019992438, 0.000549918), (0.000549918, 0.019992438))
            ThreePointArc((0.000549918, 0.019992438), (0.514497665, 0.00585565), (1.029223113, 0.019992438))
            Line((1.029223113, 0.019992438), (1.028673195, 0))
        make_face()
    chamfer5_piece_8b = extrude(amount=60.571682988, mode=Mode.PRIVATE)
    chamfer5_piece_8b = split(chamfer5_piece_8b, bisect_by=Plane(origin=(9.608440211, 2.329793627, -32.105993834), z_dir=(0, 0, -1)), keep=Keep.TOP, mode=Mode.PRIVATE)
    chamfer5_piece_8 = chamfer5_piece_8a & chamfer5_piece_8b
    add(chamfer5_piece_8)
    with BuildSketch(Plane(origin=(9.36655085, 2, -32.105993834), x_dir=(0, 0.9996219169112968, -0.027495876610589075), z_dir=(1, 0, 0))) as chamfer5_piece_9a_section:
        with BuildLine():
            Line((1.028673195, 0), (-0.056547155, 1.027117794))
            Line((-0.056547155, 1.027117794), (-0.076539593, 1.026567876))
            ThreePointArc((-0.076539593, 1.026567876), (-0.034129227, 0.51339783), (-0.019992438, -0.000549918))
            Line((-0.019992438, -0.000549918), (0.000549918, -0.019992438))
            ThreePointArc((0.000549918, -0.019992438), (0.514497665, -0.00585565), (1.029223113, -0.019992438))
            Line((1.029223113, -0.019992438), (1.028673195, 0))
        make_face()
    chamfer5_piece_9a = extrude(amount=45.836792714, mode=Mode.PRIVATE)
    chamfer5_piece_9a = split(chamfer5_piece_9a, bisect_by=Plane(origin=(11.938233838, 2.329793627, -31.776200208), z_dir=(-1, 0, 0)), keep=Keep.TOP, mode=Mode.PRIVATE)
    with BuildSketch(Plane(origin=(11.938233838, 2, -34.677676822), x_dir=(-0.027495876610585623, 0.9996219169112968, 0), z_dir=(0, 0, 1))) as chamfer5_piece_9b_section:
        with BuildLine():
            Line((1.028673195, 0), (-0.056547155, -1.027117794))
            Line((-0.056547155, -1.027117794), (-0.076539593, -1.026567876))
            ThreePointArc((-0.076539593, -1.026567876), (-0.034129227, -0.51339783), (-0.019992438, 0.000549918))
            Line((-0.019992438, 0.000549918), (0.000549918, 0.019992438))
            ThreePointArc((0.000549918, 0.019992438), (0.514497665, 0.00585565), (1.029223113, 0.019992438))
            Line((1.029223113, 0.019992438), (1.028673195, 0))
        make_face()
    chamfer5_piece_9b = extrude(amount=60.571682988, mode=Mode.PRIVATE)
    chamfer5_piece_9b = split(chamfer5_piece_9b, bisect_by=Plane(origin=(12.268027465, 2.329793627, -32.105993834), z_dir=(0, 0, -1)), keep=Keep.TOP, mode=Mode.PRIVATE)
    chamfer5_piece_9 = chamfer5_piece_9a & chamfer5_piece_9b
    add(chamfer5_piece_9)

    # Chamfer6
    chamfer6_edges = [part.edges().sort_by_distance(p)[0] for p in [
        (58.438233838, 2, -3.105993834),
    ]]
    chamfer(chamfer6_edges, length=CHAMFER6_SIZE)

    # Chamfer7
    chamfer7_edges = [part.edges().sort_by_distance(p)[0] for p in [
        (59.478792997, 0, 26.934565325),
    ]]
    chamfer(chamfer7_edges, length=CHAMFER7_SIZE - 0.0001)  # a hair under: the kernel refuses the full size


solid = part.part
